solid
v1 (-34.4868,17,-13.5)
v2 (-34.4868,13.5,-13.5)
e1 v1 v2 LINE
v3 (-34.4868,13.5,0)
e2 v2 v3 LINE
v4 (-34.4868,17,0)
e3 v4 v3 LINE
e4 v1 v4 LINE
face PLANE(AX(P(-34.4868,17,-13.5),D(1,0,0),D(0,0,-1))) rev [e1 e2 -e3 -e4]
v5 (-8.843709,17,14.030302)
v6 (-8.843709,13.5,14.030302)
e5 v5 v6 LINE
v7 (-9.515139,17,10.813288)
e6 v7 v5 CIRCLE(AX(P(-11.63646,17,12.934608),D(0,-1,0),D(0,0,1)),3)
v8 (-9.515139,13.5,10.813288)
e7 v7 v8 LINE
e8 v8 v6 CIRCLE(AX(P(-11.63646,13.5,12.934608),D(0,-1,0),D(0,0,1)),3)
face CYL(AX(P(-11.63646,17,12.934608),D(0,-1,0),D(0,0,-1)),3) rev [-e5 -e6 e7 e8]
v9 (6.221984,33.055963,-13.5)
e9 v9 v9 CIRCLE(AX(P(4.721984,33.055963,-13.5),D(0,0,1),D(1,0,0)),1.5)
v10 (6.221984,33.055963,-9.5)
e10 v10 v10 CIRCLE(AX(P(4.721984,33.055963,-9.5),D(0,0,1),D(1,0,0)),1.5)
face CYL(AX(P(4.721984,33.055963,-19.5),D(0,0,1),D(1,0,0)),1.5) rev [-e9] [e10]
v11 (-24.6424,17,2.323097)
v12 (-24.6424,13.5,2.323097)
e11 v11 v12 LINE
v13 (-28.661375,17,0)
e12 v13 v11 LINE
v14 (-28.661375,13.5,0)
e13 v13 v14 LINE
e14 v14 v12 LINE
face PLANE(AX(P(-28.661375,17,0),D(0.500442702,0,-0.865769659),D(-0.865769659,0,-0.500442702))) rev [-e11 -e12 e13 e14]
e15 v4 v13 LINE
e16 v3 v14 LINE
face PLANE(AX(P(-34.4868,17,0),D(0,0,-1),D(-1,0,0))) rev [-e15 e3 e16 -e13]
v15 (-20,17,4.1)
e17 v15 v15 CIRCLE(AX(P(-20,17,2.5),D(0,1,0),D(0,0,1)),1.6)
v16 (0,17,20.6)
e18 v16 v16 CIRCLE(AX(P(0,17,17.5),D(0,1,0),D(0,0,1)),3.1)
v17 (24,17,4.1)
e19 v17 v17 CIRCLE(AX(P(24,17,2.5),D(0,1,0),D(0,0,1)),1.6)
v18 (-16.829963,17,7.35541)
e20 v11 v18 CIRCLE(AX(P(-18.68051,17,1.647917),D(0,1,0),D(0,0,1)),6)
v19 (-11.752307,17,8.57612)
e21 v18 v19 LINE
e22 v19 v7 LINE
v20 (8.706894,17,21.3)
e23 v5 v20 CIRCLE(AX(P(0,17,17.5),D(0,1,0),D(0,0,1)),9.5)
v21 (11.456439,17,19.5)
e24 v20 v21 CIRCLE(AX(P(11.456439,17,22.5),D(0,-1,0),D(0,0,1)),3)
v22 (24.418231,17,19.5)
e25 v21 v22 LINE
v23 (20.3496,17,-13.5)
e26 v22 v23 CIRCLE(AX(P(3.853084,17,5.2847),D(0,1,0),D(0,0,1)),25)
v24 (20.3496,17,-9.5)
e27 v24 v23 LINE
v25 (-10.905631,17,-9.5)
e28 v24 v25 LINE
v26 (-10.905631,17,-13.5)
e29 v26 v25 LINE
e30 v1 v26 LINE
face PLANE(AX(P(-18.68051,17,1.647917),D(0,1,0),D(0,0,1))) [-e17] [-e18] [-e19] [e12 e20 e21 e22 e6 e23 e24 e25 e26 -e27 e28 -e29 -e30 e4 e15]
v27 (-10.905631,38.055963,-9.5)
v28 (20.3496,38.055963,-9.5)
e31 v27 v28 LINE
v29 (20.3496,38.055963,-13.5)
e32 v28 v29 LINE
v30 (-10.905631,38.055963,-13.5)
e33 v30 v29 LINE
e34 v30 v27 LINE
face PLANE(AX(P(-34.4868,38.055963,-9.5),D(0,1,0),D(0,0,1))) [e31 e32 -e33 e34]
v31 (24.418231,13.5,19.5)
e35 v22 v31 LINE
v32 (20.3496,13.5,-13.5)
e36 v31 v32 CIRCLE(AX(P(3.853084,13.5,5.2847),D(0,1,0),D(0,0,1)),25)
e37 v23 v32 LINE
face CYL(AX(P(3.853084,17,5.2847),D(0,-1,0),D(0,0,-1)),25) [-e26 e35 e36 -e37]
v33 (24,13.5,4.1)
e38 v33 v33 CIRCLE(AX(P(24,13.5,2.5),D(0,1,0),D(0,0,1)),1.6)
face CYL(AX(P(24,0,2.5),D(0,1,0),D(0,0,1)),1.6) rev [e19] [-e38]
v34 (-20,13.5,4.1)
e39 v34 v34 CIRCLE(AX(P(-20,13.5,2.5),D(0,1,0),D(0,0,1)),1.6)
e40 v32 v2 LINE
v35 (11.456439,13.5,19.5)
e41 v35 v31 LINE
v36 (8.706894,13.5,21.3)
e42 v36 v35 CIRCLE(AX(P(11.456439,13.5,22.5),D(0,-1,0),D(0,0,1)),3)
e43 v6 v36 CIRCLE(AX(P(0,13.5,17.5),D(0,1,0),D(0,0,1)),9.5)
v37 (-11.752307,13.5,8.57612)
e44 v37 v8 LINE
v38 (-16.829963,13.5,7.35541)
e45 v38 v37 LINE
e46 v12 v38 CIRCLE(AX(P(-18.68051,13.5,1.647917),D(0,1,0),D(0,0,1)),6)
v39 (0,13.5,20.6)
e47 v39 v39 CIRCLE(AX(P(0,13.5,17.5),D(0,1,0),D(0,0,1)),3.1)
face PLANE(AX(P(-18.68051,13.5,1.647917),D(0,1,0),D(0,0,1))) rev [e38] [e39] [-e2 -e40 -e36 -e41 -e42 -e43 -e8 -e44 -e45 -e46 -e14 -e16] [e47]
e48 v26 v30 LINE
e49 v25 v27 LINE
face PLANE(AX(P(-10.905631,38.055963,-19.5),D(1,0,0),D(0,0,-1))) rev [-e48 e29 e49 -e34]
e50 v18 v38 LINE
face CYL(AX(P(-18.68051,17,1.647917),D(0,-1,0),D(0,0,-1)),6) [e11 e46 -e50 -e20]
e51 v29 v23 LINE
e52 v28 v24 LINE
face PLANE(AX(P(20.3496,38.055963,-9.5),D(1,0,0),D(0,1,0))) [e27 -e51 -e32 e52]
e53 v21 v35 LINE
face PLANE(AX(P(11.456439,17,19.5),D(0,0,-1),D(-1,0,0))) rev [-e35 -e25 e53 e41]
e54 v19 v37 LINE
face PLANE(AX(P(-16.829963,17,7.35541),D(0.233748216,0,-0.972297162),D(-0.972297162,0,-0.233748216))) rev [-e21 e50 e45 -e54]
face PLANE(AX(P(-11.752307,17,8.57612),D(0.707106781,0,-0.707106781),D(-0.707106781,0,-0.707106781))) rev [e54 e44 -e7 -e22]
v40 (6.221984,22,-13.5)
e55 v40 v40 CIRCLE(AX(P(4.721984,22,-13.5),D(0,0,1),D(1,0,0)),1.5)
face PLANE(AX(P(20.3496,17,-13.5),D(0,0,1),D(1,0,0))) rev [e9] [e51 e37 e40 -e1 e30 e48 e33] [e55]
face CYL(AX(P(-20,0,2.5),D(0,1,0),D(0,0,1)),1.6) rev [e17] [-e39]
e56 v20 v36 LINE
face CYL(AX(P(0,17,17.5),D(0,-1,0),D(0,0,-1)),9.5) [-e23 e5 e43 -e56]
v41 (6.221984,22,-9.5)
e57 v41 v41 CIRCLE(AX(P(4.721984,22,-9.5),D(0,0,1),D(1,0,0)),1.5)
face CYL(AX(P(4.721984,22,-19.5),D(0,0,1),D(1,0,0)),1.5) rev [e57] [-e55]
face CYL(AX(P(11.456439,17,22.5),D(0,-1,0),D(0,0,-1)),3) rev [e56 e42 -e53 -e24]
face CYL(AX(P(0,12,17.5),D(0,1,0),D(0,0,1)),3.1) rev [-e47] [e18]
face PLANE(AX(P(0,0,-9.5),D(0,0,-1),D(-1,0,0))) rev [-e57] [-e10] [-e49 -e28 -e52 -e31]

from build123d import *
from build123d.topology import SkipClean

# Parameters (mm, degrees)
CROQUIS1_W              = 70
CROQUIS1_H              = 65
EXTRUIR1_DEPTH          = 3.5
CROQUIS2_R              = 3.1
EXTRUIR2_DEPTH          = 5
EXTRUIR3_DEPTH          = 10
CROQUIS4_OUTSIDE_W      = 91.294
CROQUIS4_OUTSIDE_H      = 86.294
EXTRUIR4_DEPTH          = 10
REDONDEO1_R             = 3
EXTRUIR5_DEPTH          = 13.5
EXTRUIR6_DEPTH          = 3.5
CROQUIS7_R              = 1.6
EXTRUIR7_DEPTH          = 47.982330447
CROQUIS8_R              = 3.1
EXTRUIR8_DEPTH          = 5
CROQUIS9_W              = 0.7
CROQUIS9_H              = 10.5
EXTRUIR9_DEPTH          = 10
EXTRUIR10_DEPTH         = 63.752948337
EXTRUIR10_DEPTH_BACK    = 10
CROQUIS10_W             = 3.0625
CROQUIS10_H             = 5
CROQUIS11_W             = 54.8364
CROQUIS11_H             = 21.05596306
SALIENTE_EXTRUIR1_DEPTH = 4
CROQUIS15_W             = 23.581168674
CROQUIS15_H             = 21.05596306
CORTAR_EXTRUIR3_DEPTH   = 10
CROQUIS16_R             = 1.5
CORTAR_EXTRUIR4_DEPTH   = 10


with BuildPart() as part:
    # Croquis1 → Extruir1 (new body)
    with BuildSketch(Plane(origin=(0, 0, 0), x_dir=(1, 0, 0), z_dir=(0, 1, 0))):
        Rectangle(CROQUIS1_W, CROQUIS1_H)
    extrude(amount=EXTRUIR1_DEPTH)

    # Croquis2 → Extruir2 (cut)
    with BuildSketch(Plane(origin=(0, 3.5, 0), x_dir=(1, 0, 0), z_dir=(0, 1, 0))):
        with Locations(Location((0, -17.5, 0), (0, 0, 270))):
            Circle(CROQUIS2_R)
    extrude(amount=-EXTRUIR2_DEPTH, mode=Mode.SUBTRACT)

    # Croquis3 → Extruir3 (add)
    with BuildSketch(Plane(origin=(0, 3.5, 0), x_dir=(1, 0, 0), z_dir=(0, 1, 0))):
        with BuildLine():
            Line((-34.4868, 13.5), (20.3496, 13.5))
            Line((20.3496, 13.5), (20.3496, 0))
            Line((20.3496, 0), (17.146428199, 0))
            ThreePointArc((17.146428199, 0), (22.955777517, -8.939493087), (24.418230894, -19.5))
            Line((24.418230894, -19.5), (9.287087811, -19.5))
            ThreePointArc((9.287087811, -19.5), (-3.635492607, -26.276855559), (-7.981176331, -12.347250794))
            Line((-7.981176331, -12.347250794), (-18.680510212, -1.647916913))
            ThreePointArc((-18.680510212, -1.647916913), (-17.932408832, -0.806327142), (-17.146428199, 0))
            Line((-17.146428199, 0), (-34.4868, 0))
            Line((-34.4868, 0), (-34.4868, 13.5))
        make_face()
        with BuildLine():
            Line((-32.9868, 1.5), (-12.961481397, 1.5))
            ThreePointArc((-12.961481397, 1.5), (-14.868021343, 0.048274597), (-16.613165932, -1.593940849))
            Line((-16.613165932, -1.593940849), (-5.999348286, -12.207758495))
            ThreePointArc((-5.999348286, -12.207758495), (-3.061467459, -24.89103626), (7.984359711, -18))
            Line((7.984359711, -18), (22.994564575, -18))
            ThreePointArc((22.994564575, -18), (20.451694563, -6.977253708), (12.961481397, 1.5))
            Line((12.961481397, 1.5), (18.8496, 1.5))
            Line((18.8496, 1.5), (18.8496, 12))
            Line((18.8496, 12), (-32.9868, 12))
            Line((-32.9868, 12), (-32.9868, 1.5))
        make_face(mode=Mode.SUBTRACT)
    extrude(amount=EXTRUIR3_DEPTH)

    # Croquis4 outside → Extruir4 (cut)
    with SkipClean():  # the faces are left unmerged after this step: merging them gives an invalid solid
        with BuildSketch(Plane(origin=(0, 3.5, 0), x_dir=(1, 0, 0), z_dir=(0, 1, 0))):
            Rectangle(CROQUIS4_OUTSIDE_W, CROQUIS4_OUTSIDE_H)
            with BuildLine():
                Line((-34.4868, 0), (-17.146428199, 0))
                ThreePointArc((-17.146428199, 0), (-17.932408832, -0.806327142), (-18.680510212, -1.647916913))
                Line((-18.680510212, -1.647916913), (-7.981176331, -12.347250794))
                ThreePointArc((-7.981176331, -12.347250794), (-3.635492607, -26.276855559), (9.287087811, -19.5))
                Line((9.287087811, -19.5), (24.418230894, -19.5))
                ThreePointArc((24.418230894, -19.5), (22.955777517, -8.939493087), (17.146428199, 0))
                Line((17.146428199, 0), (20.3496, 0))
                Line((20.3496, 0), (20.3496, 13.5))
                Line((20.3496, 13.5), (-34.4868, 13.5))
                Line((-34.4868, 13.5), (-34.4868, 0))
            make_face(mode=Mode.SUBTRACT)
        extrude(amount=-EXTRUIR4_DEPTH, mode=Mode.SUBTRACT)

    # Redondeo1
    redondeo1_edges = [part.edges().sort_by_distance(p)[0] for p in [
        (-7.981176331, 8.5, 12.347250794),
        (9.287087811, 8.5, 19.5),
        (-5.999348286, 8.5, 12.207758495),
        (7.984359711, 8.5, 18),
    ]]
    fillet(redondeo1_edges, radius=REDONDEO1_R)

    # Croquis5 → Extruir5 (add)
    with SkipClean():  # the faces are left unmerged after this step: merging them gives an invalid solid
        with BuildSketch(Plane.XZ):
            with BuildLine():
                Line((-18.680510212, 1.647916913), (-14.437869525, 5.8905576))
                ThreePointArc((-14.437869525, 5.8905576), (-21.723092903, 6.819250451), (-24.449770984, 0))
                Line((-24.449770984, 0), (-17.146428199, 0))
                ThreePointArc((-17.146428199, 0), (-17.932408832, 0.806327142), (-18.680510212, 1.647916913))
            make_face()
            with BuildLine():
                Line((20.3496, 0), (20.3496, -13.5))
                ThreePointArc((20.3496, -13.5), (28.665212431, 2.225567304), (24.418230894, 19.5))
                ThreePointArc((24.418230894, 19.5), (22.955777517, 8.939493087), (17.146428199, 0))
                Line((17.146428199, 0), (20.3496, 0))
            make_face()
        extrude(amount=-EXTRUIR5_DEPTH)

    # Chaflán1
    # the kernel refuses this chamfer: 5, 4.044665138 mm, written as the material it adds along each edge
    with BuildSketch(Plane(origin=(-14.437869525, 3.5, 5.8905576), x_dir=(-0.8768595348589333, 0, 0.4807466652270976), z_dir=(0, 1, 0))) as chafl_n1_piece_1:
        with BuildLine():
            Line((2.949791971, 0), (-1.211824758, 3.780414953))
            Line((-1.211824758, 3.780414953), (-1.307822013, 3.752405544))
            ThreePointArc((-1.307822013, 3.752405544), (-0.651776703, 1.876825504), (-0.095997255, -0.02800941))
            Line((-0.095997255, -0.02800941), (0.02800941, -0.095997255))
            ThreePointArc((0.02800941, -0.095997255), (1.47002525, 0.136406993), (2.931105495, -0.098238565))
            Line((2.931105495, -0.098238565), (2.949791971, 0))
        make_face()
    extrude(amount=10)
    with BuildSketch(Plane(origin=(-24.449770984, 3.5, 0), x_dir=(-0.008036803743584595, 0, 0.9999677043712897), z_dir=(0, 1, 0))) as chafl_n1_piece_2:
        with BuildLine():
            Line((2.423263449, 0), (-0.064845869, -4.38542071))
            Line((-0.064845869, -4.38542071), (-0.164842639, -4.386224391))
            ThreePointArc((-0.164842639, -4.386224391), (-0.082377051, -2.193111839), (-0.09999677, -0.00080368))
            Line((-0.09999677, -0.00080368), (0.026691621, 0.096371974))
            ThreePointArc((0.026691621, 0.096371974), (1.204598314, -0.104316531), (2.411212242, 0.099271186))
            Line((2.411212242, 0.099271186), (2.423263449, 0))
        make_face()
    extrude(amount=10)
    with BuildSketch(Plane(origin=(-24.449770984, 0, 0), x_dir=(-0.9997395779240649, 0, -0.022820524363231526), z_dir=(0, 1, 0))) as chafl_n1_piece_3:
        with BuildLine():
            Line((4.385900112, 0), (-0.035828136, 2.422998574))
            Line((-0.035828136, 2.422998574), (-0.134910293, 2.409480951))
            ThreePointArc((-0.134910293, 2.409480951), (0.08649505, 1.206008973), (-0.096756078, 0.025263837))
            Line((-0.096756078, 0.025263837), (0.002282052, -0.099973958))
            ThreePointArc((0.002282052, -0.099973958), (2.194090072, -0.04994272), (4.388182164, -0.099973958))
            Line((4.388182164, -0.099973958), (4.385900112, 0))
        make_face()
    extrude(amount=3.5)
    with BuildSketch(Plane(origin=(-14.437869525, 0, 5.8905576), x_dir=(0.7254657554746632, 0, 0.6882582637597433), z_dir=(0, 1, 0))) as chafl_n1_piece_4:
        with BuildLine():
            Line((3.96989376, 0), (-0.900434913, -2.809001538))
            Line((-0.900434913, -2.809001538), (-0.98828054, -2.761219262))
            ThreePointArc((-0.98828054, -2.761219262), (-0.318834214, -1.441501248), (-0.099965384, 0.002630967))
            Line((-0.099965384, 0.002630967), (0.002630967, 0.099965384))
            ThreePointArc((0.002630967, 0.099965384), (1.986203869, 0.047760165), (3.972524727, 0.099965384))
            Line((3.972524727, 0.099965384), (3.96989376, 0))
        make_face()
    extrude(amount=3.5)


with BuildPart() as body_2:
    # Croquis6 → Extruir6 (new body)
    with BuildSketch(Plane(origin=(0, 13.5, 0), x_dir=(1, 0, 0), z_dir=(0, 1, 0))):
        with BuildLine():
            Line((-34.4868, 13.5), (-34.4868, 0))
            Line((-34.4868, 0), (-28.661374979, 0))
            Line((-28.661374979, 0), (-24.642400208, -2.323096648))
            ThreePointArc((-24.642400208, -2.323096648), (-21.929637735, -6.692039268), (-16.829963308, -7.355409896))
            Line((-16.829963308, -7.355409896), (-11.752306982, -8.576120143))
            Line((-11.752306982, -8.576120143), (-9.515139435, -10.813287689))
            ThreePointArc((-9.515139435, -10.813287689), (-8.69974084, -12.321679102), (-8.843709432, -14.030302105))
            ThreePointArc((-8.843709432, -14.030302105), (-3.635492607, -26.276855559), (8.70689382, -21.3))
            ThreePointArc((8.70689382, -21.3), (9.813271565, -19.99001992), (11.456439237, -19.5))
            Line((11.456439237, -19.5), (24.418230894, -19.5))
            ThreePointArc((24.418230894, -19.5), (28.665212431, -2.225567304), (20.3496, 13.5))
            Line((20.3496, 13.5), (-34.4868, 13.5))
        make_face()
    extrude(amount=EXTRUIR6_DEPTH)


with BuildPart() as extruir7_tool:
    # Croquis7 → Extruir7 (new, through all)
    with BuildSketch(Plane(origin=(0, 17, 0), x_dir=(1, 0, 0), z_dir=(0, 1, 0))):
        with Locations(Location((-20, -2.5, 0), (0, 0, 270))):
            Circle(CROQUIS7_R)
        with Locations(Location((24, -2.5, 0), (0, 0, 270))):
            Circle(CROQUIS7_R)
    extrude(amount=-EXTRUIR7_DEPTH)


with BuildPart() as part_1:
    add(part.part)

    # Extruir7: cut by extruir7_tool
    add(extruir7_tool.part, mode=Mode.SUBTRACT)

    # Croquis9 → Extruir9 (cut)
    with BuildSketch(Plane(origin=(0, 13.5, 0), x_dir=(1, 0, 0), z_dir=(0, 1, 0))):
        with Locations((19.1996, 6.75)):
            Rectangle(CROQUIS9_W, CROQUIS9_H)
    extrude(amount=-EXTRUIR9_DEPTH, mode=Mode.SUBTRACT)

    # Croquis10 → Extruir10 (cut, two sides: drawn at the far end of the back side and taken through both)
    with BuildSketch(Plane.ZY.offset(-19.5496).offset(-EXTRUIR10_DEPTH_BACK)):
        with Locations((-8.9375, 8.5)):
            Rectangle(CROQUIS10_W, CROQUIS10_H)
    extrude(amount=EXTRUIR10_DEPTH + EXTRUIR10_DEPTH_BACK, mode=Mode.SUBTRACT)


with BuildPart() as body_2_1:
    add(body_2.part)

    # Extruir7: cut by extruir7_tool
    add(extruir7_tool.part, mode=Mode.SUBTRACT)

    # Croquis8 → Extruir8 (cut)
    with BuildSketch(Plane(origin=(0, 17, 0), x_dir=(1, 0, 0), z_dir=(0, 1, 0))):
        with Locations(Location((0, -17.5, 0), (0, 0, 270))):
            Circle(CROQUIS8_R)
    extrude(amount=-EXTRUIR8_DEPTH, mode=Mode.SUBTRACT)

    # Croquis11 → Saliente-Extruir1 (add)
    with BuildSketch(Plane(origin=(0, 0, -13.5), x_dir=(-1, 0, 0), z_dir=(0, 0, -1))):
        with Locations((7.0686, 27.52798153)):
            Rectangle(CROQUIS11_W, CROQUIS11_H)
    extrude(amount=-SALIENTE_EXTRUIR1_DEPTH)

    # Croquis15 → Cortar-Extruir3 (cut)
    with BuildSketch(Plane.XY.offset(-9.5)):
        with Locations((-22.696215663, 27.52798153)):
            Rectangle(CROQUIS15_W, CROQUIS15_H)
    extrude(amount=-CORTAR_EXTRUIR3_DEPTH, mode=Mode.SUBTRACT)

    # Croquis16 → Cortar-Extruir4 (cut)
    with BuildSketch(Plane.XY.offset(-9.5)):
        with Locations((4.721984337, 33.05596306)):
            Circle(CROQUIS16_R)
        with Locations((4.721984337, 22)):
            Circle(CROQUIS16_R)
    extrude(amount=-CORTAR_EXTRUIR4_DEPTH, mode=Mode.SUBTRACT)


solid = body_2_1.part
